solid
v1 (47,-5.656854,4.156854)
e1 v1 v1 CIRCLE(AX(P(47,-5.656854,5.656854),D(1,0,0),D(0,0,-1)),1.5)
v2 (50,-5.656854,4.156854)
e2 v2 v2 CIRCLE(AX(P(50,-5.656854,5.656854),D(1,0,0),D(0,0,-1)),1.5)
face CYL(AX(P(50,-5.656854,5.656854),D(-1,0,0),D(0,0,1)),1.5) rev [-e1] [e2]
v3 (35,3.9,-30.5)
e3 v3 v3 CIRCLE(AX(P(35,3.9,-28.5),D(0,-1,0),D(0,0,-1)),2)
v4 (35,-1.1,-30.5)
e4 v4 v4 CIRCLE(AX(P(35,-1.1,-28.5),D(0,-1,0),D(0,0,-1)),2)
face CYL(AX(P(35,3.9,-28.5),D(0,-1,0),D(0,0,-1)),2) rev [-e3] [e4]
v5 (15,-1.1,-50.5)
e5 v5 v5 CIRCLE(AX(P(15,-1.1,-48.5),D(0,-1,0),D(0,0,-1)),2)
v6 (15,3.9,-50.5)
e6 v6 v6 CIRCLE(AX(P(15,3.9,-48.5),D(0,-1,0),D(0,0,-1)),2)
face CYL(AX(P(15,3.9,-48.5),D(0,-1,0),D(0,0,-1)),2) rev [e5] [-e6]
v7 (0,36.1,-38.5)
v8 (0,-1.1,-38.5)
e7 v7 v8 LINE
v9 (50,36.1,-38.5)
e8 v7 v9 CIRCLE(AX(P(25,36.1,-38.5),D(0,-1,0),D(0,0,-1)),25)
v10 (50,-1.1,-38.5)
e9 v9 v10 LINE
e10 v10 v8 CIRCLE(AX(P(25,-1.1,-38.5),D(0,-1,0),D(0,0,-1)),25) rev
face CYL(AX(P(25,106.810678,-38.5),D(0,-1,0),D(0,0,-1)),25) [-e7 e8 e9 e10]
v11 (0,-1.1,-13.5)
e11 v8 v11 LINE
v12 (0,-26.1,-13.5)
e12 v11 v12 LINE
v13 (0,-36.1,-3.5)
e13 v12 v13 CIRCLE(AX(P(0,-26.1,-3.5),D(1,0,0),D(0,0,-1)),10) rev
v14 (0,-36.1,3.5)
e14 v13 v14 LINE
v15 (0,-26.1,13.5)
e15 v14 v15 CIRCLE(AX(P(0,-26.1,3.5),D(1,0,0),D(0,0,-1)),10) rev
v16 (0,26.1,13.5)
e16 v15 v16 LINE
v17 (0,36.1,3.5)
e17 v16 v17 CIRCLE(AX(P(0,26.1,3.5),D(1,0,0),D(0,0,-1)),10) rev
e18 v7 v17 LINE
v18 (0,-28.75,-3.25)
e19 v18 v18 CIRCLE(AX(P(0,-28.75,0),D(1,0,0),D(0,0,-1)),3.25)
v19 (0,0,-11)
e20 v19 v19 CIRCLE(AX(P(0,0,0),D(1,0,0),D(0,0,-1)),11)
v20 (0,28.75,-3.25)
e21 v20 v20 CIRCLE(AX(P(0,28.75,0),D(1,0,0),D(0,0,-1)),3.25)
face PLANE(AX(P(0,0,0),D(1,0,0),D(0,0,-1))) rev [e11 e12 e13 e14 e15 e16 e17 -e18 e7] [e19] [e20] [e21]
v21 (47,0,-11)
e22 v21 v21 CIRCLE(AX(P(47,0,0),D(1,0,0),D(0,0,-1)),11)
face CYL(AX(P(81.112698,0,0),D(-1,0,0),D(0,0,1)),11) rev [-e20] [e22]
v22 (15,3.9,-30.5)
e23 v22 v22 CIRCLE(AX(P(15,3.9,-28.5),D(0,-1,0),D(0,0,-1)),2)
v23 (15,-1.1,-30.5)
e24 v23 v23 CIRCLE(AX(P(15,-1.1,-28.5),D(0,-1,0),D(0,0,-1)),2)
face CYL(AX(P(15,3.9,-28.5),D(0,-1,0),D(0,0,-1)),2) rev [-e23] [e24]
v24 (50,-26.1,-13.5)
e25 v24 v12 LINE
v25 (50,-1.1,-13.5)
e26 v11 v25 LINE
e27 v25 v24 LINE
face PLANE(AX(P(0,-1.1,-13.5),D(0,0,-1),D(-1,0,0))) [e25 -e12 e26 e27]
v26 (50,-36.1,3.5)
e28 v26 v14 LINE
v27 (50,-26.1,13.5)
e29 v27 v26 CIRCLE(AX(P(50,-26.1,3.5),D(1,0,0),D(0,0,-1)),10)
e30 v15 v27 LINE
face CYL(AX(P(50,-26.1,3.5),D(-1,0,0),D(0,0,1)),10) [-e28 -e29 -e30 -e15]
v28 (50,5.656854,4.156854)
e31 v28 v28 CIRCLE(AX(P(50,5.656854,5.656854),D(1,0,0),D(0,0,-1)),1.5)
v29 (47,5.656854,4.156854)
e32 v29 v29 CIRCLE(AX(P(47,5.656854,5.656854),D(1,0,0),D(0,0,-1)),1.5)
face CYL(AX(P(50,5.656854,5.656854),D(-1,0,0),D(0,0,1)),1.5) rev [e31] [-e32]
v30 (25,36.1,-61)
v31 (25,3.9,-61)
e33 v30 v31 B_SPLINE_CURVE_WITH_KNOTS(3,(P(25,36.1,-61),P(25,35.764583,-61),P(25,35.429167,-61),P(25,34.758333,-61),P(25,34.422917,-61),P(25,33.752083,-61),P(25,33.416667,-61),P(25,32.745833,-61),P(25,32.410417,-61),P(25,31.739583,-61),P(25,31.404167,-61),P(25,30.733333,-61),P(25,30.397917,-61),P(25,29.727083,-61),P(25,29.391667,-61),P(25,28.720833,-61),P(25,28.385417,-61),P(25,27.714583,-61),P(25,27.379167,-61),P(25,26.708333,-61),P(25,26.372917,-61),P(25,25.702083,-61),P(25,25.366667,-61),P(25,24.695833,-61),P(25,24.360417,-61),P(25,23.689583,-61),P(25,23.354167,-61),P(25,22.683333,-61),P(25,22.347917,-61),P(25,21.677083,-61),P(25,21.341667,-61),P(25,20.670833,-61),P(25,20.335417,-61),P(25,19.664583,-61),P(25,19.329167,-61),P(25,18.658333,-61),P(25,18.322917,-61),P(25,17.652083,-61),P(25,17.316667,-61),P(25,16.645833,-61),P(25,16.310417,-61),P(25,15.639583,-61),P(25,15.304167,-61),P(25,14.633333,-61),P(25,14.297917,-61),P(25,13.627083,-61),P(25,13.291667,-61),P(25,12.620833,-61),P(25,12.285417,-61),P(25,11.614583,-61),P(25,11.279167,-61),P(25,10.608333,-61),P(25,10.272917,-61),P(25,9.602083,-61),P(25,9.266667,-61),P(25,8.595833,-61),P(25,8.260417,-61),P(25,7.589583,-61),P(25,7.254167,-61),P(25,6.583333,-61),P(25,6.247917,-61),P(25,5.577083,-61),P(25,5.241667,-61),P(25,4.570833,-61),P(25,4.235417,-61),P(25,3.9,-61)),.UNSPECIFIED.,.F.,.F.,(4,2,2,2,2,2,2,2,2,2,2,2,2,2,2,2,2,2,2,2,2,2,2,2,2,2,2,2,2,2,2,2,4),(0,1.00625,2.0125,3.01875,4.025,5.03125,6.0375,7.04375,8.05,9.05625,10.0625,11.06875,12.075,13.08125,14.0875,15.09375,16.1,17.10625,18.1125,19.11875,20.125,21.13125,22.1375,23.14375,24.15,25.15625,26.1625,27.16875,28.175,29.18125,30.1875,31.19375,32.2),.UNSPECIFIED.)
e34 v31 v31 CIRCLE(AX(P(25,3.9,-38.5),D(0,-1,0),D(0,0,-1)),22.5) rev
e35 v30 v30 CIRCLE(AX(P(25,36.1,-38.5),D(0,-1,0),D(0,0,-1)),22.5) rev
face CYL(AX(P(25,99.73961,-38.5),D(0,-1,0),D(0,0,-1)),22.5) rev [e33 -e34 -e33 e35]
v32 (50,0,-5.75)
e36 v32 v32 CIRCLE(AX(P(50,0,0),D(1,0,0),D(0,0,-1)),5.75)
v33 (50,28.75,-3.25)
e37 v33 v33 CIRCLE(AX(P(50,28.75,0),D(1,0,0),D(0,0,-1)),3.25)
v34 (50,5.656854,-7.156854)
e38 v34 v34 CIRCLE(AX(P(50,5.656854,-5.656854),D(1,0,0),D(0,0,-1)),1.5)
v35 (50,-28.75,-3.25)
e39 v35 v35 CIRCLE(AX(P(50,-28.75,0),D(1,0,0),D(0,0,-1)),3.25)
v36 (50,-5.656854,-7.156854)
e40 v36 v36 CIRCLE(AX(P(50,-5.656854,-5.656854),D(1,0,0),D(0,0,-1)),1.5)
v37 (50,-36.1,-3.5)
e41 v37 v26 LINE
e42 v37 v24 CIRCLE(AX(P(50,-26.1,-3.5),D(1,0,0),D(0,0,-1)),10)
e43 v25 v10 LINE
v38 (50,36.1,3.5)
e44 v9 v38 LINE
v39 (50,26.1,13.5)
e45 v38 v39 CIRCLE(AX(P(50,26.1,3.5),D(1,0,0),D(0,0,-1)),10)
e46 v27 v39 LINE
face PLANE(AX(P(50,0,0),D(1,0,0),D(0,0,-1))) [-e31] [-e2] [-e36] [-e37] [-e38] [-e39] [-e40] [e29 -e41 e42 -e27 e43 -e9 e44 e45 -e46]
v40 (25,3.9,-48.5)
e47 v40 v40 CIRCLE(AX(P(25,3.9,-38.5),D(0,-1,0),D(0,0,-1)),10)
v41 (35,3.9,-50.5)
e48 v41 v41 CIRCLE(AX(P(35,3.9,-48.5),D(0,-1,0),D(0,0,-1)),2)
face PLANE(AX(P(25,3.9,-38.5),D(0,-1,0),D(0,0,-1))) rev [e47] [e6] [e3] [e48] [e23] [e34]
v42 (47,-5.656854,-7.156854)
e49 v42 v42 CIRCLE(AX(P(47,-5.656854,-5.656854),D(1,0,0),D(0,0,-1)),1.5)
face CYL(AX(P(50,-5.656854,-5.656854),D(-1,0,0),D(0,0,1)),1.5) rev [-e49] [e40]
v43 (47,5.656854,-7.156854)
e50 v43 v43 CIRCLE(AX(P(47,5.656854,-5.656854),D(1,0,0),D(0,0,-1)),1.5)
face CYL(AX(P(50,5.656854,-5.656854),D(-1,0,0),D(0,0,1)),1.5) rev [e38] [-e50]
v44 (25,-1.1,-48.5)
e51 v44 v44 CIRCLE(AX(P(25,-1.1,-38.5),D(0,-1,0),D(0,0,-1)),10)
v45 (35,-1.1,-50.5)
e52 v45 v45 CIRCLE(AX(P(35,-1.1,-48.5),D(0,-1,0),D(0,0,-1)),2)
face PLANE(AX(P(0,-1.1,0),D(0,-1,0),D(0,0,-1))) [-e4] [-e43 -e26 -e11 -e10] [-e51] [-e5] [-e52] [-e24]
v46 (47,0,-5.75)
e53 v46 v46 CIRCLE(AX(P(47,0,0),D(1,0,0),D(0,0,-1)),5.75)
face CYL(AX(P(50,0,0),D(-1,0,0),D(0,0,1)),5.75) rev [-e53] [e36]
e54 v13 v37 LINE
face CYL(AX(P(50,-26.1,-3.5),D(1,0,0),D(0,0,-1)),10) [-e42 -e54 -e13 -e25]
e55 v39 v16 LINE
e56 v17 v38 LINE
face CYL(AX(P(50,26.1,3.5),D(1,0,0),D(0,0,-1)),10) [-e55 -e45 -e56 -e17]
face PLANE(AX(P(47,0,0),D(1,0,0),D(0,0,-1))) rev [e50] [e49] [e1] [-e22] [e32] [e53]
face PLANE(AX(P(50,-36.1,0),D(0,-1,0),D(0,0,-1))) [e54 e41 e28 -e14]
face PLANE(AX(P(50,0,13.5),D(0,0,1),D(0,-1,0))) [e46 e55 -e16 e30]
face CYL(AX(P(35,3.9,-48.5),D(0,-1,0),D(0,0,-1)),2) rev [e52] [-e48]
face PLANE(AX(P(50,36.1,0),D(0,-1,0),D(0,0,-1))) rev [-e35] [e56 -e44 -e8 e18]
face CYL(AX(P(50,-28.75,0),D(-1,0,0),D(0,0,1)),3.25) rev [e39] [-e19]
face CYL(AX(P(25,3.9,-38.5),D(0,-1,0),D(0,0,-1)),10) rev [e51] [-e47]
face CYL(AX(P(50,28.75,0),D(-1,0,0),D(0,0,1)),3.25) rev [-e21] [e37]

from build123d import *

# Parameters (mm, degrees)
SKETCH1_W           = 27
SKETCH1_H           = 72.2
SKETCH1_R           = 11
SKETCH1_R_2         = 3.25
SKETCH1_R_3         = 5.75
SKETCH1_R_4         = 1.5
BOSS_EXTRUDE1_DEPTH = 50
BOSS_EXTRUDE3_DEPTH = 72.2
CUT_EXTRUDE2_DEPTH  = 35
SKETCH1_3_R         = 11
SKETCH1_3_R_2       = 5.75
SKETCH1_3_R_3       = 1.5
CUT_EXTRUDE1_DEPTH  = 47
SKETCH3_R           = 22.5
SKETCH3_R_2         = 10
SKETCH3_R_3         = 2
CUT_EXTRUDE3_DEPTH  = 37.2
SKETCH3_6_R         = 22.5
SKETCH3_6_R_2       = 2
SKETCH3_6_R_3       = 10
BOSS_EXTRUDE4_DEPTH = 5
FILLET1_R           = 10


# Read off the part's stored shape, not the designer's step: Cut-Extrude2
with BuildPart() as part:
    # Sketch1 → Boss-Extrude1 (new body)
    # profile 1 of 2: a face of its own
    with BuildSketch(Plane(origin=(0, 0, 0), x_dir=(0, 0, -1), z_dir=(1, 0, 0))):
        Rectangle(SKETCH1_W, SKETCH1_H)
        Circle(SKETCH1_R, mode=Mode.SUBTRACT)
        with Locations((0, -28.75)):
            Circle(SKETCH1_R_2, mode=Mode.SUBTRACT)
        with Locations((0, 28.75)):
            Circle(SKETCH1_R_2, mode=Mode.SUBTRACT)
    # profile 2 of 2: a face of its own
    with BuildSketch(Plane(origin=(0, 0, 0), x_dir=(0, 0, -1), z_dir=(1, 0, 0))):
        Circle(SKETCH1_R)
        Circle(SKETCH1_R_3, mode=Mode.SUBTRACT)
        with Locations((-5.656854249, 5.656854249)):
            Circle(SKETCH1_R_4, mode=Mode.SUBTRACT)
        with Locations((5.656854249, 5.656854249)):
            Circle(SKETCH1_R_4, mode=Mode.SUBTRACT)
        with Locations((5.656854249, -5.656854249)):
            Circle(SKETCH1_R_4, mode=Mode.SUBTRACT)
        with Locations((-5.656854249, -5.656854249)):
            Circle(SKETCH1_R_4, mode=Mode.SUBTRACT)
    extrude(amount=BOSS_EXTRUDE1_DEPTH)

    # Sketch2 → Boss-Extrude3 (add)
    with BuildSketch(Plane(origin=(0, -36.1, 0), x_dir=(1, 0, 0), z_dir=(0, 1, 0))):
        with BuildLine():
            Line((0, 13.5), (25, 13.5))
            ThreePointArc((25, 13.5), (7.32233047, 20.82233047), (0, 38.5))
            Line((0, 38.5), (0, 13.5))
        make_face()
        with BuildLine():
            ThreePointArc((25, 13.5), (42.67766953, 20.82233047), (50, 38.5))
            Line((50, 38.5), (0, 38.5))
            ThreePointArc((0, 38.5), (7.32233047, 20.82233047), (25, 13.5))
        make_face()
        with BuildLine():
            Line((25, 13.5), (50, 13.5))
            Line((50, 13.5), (50, 38.5))
            ThreePointArc((50, 38.5), (42.67766953, 20.82233047), (25, 13.5))
        make_face()
        with BuildLine():
            Line((0, 38.5), (50, 38.5))
            ThreePointArc((50, 38.5), (25, 63.5), (0, 38.5))
        make_face()
    extrude(amount=BOSS_EXTRUDE3_DEPTH)

    # Cut-Extrude2 outline → Cut-Extrude2 (cut)
    with BuildSketch(Plane(origin=(0, -36.1, 0), x_dir=(1, 0, 0), z_dir=(0, 1, 0))):
        with BuildLine():
            Line((0, 13.5), (50, 13.5))
            Line((50, 13.5), (50, 38.5))
            ThreePointArc((50, 38.5), (25, 63.5), (0, 38.5))
            Line((0, 38.5), (0, 13.5))
        make_face()
    extrude(amount=CUT_EXTRUDE2_DEPTH, mode=Mode.SUBTRACT)

    # Sketch1<3> → Cut-Extrude1 (cut)
    with BuildSketch(Plane(origin=(0, 0, 0), x_dir=(0, 0, -1), z_dir=(1, 0, 0))):
        Circle(SKETCH1_3_R)
        Circle(SKETCH1_3_R_2, mode=Mode.SUBTRACT)
        with Locations((-5.656854249, 5.656854249)):
            Circle(SKETCH1_3_R_3, mode=Mode.SUBTRACT)
        with Locations((5.656854249, 5.656854249)):
            Circle(SKETCH1_3_R_3, mode=Mode.SUBTRACT)
        with Locations((5.656854249, -5.656854249)):
            Circle(SKETCH1_3_R_3, mode=Mode.SUBTRACT)
        with Locations((-5.656854249, -5.656854249)):
            Circle(SKETCH1_3_R_3, mode=Mode.SUBTRACT)
    extrude(amount=CUT_EXTRUDE1_DEPTH, mode=Mode.SUBTRACT)

    # Sketch3 → Cut-Extrude3 (cut)
    # profile 1 of 6: a face of its own
    with BuildSketch(Plane.XZ.offset(1.1)):
        with Locations(Location((25, -38.5, 0), (0, 0, 270))):
            Circle(SKETCH3_R)
        with Locations((25, -38.5)):
            Circle(SKETCH3_R_2, mode=Mode.SUBTRACT)
        with Locations((15, -48.5)):
            Circle(SKETCH3_R_3, mode=Mode.SUBTRACT)
        with Locations((35, -48.5)):
            Circle(SKETCH3_R_3, mode=Mode.SUBTRACT)
        with Locations((35, -28.5)):
            Circle(SKETCH3_R_3, mode=Mode.SUBTRACT)
        with Locations((15, -28.5)):
            Circle(SKETCH3_R_3, mode=Mode.SUBTRACT)
    # profile 2 of 6: a face of its own
    with BuildSketch(Plane.XZ.offset(1.1)):
        with Locations((25, -38.5)):
            Circle(SKETCH3_R_2)
    # profile 3 of 6: a face of its own
    with BuildSketch(Plane.XZ.offset(1.1)):
        with Locations((35, -28.5)):
            Circle(SKETCH3_R_3)
    # profile 4 of 6: a face of its own
    with BuildSketch(Plane.XZ.offset(1.1)):
        with Locations((15, -28.5)):
            Circle(SKETCH3_R_3)
    # profile 5 of 6: a face of its own
    with BuildSketch(Plane.XZ.offset(1.1)):
        with Locations((15, -48.5)):
            Circle(SKETCH3_R_3)
    # profile 6 of 6: a face of its own
    with BuildSketch(Plane.XZ.offset(1.1)):
        with Locations((35, -48.5)):
            Circle(SKETCH3_R_3)
    extrude(amount=-CUT_EXTRUDE3_DEPTH, mode=Mode.SUBTRACT)

    # Sketch3<6> → Boss-Extrude4 (add)
    with BuildSketch(Plane.XZ.offset(1.1)):
        with Locations(Location((25, -38.5, 0), (0, 0, 270))):
            Circle(SKETCH3_6_R)
        with Locations(Location((15, -28.5, 0), (0, 0, 270))):
            Circle(SKETCH3_6_R_2, mode=Mode.SUBTRACT)
        with Locations(Location((35, -28.5, 0), (0, 0, 270))):
            Circle(SKETCH3_6_R_2, mode=Mode.SUBTRACT)
        with Locations(Location((35, -48.5, 0), (0, 0, 270))):
            Circle(SKETCH3_6_R_2, mode=Mode.SUBTRACT)
        with Locations(Location((15, -48.5, 0), (0, 0, 270))):
            Circle(SKETCH3_6_R_2, mode=Mode.SUBTRACT)
        with Locations(Location((25, -38.5, 0), (0, 0, 270))):
            Circle(SKETCH3_6_R_3, mode=Mode.SUBTRACT)
    extrude(amount=-BOSS_EXTRUDE4_DEPTH)

    # Fillet1
    fillet1_edges = [part.edges().sort_by_distance(p)[0] for p in [
        (25, 36.1, 13.5),
        (25, -36.1, 13.5),
        (25, -36.1, -13.5),
    ]]
    fillet(fillet1_edges, radius=FILLET1_R)


solid = part.part
